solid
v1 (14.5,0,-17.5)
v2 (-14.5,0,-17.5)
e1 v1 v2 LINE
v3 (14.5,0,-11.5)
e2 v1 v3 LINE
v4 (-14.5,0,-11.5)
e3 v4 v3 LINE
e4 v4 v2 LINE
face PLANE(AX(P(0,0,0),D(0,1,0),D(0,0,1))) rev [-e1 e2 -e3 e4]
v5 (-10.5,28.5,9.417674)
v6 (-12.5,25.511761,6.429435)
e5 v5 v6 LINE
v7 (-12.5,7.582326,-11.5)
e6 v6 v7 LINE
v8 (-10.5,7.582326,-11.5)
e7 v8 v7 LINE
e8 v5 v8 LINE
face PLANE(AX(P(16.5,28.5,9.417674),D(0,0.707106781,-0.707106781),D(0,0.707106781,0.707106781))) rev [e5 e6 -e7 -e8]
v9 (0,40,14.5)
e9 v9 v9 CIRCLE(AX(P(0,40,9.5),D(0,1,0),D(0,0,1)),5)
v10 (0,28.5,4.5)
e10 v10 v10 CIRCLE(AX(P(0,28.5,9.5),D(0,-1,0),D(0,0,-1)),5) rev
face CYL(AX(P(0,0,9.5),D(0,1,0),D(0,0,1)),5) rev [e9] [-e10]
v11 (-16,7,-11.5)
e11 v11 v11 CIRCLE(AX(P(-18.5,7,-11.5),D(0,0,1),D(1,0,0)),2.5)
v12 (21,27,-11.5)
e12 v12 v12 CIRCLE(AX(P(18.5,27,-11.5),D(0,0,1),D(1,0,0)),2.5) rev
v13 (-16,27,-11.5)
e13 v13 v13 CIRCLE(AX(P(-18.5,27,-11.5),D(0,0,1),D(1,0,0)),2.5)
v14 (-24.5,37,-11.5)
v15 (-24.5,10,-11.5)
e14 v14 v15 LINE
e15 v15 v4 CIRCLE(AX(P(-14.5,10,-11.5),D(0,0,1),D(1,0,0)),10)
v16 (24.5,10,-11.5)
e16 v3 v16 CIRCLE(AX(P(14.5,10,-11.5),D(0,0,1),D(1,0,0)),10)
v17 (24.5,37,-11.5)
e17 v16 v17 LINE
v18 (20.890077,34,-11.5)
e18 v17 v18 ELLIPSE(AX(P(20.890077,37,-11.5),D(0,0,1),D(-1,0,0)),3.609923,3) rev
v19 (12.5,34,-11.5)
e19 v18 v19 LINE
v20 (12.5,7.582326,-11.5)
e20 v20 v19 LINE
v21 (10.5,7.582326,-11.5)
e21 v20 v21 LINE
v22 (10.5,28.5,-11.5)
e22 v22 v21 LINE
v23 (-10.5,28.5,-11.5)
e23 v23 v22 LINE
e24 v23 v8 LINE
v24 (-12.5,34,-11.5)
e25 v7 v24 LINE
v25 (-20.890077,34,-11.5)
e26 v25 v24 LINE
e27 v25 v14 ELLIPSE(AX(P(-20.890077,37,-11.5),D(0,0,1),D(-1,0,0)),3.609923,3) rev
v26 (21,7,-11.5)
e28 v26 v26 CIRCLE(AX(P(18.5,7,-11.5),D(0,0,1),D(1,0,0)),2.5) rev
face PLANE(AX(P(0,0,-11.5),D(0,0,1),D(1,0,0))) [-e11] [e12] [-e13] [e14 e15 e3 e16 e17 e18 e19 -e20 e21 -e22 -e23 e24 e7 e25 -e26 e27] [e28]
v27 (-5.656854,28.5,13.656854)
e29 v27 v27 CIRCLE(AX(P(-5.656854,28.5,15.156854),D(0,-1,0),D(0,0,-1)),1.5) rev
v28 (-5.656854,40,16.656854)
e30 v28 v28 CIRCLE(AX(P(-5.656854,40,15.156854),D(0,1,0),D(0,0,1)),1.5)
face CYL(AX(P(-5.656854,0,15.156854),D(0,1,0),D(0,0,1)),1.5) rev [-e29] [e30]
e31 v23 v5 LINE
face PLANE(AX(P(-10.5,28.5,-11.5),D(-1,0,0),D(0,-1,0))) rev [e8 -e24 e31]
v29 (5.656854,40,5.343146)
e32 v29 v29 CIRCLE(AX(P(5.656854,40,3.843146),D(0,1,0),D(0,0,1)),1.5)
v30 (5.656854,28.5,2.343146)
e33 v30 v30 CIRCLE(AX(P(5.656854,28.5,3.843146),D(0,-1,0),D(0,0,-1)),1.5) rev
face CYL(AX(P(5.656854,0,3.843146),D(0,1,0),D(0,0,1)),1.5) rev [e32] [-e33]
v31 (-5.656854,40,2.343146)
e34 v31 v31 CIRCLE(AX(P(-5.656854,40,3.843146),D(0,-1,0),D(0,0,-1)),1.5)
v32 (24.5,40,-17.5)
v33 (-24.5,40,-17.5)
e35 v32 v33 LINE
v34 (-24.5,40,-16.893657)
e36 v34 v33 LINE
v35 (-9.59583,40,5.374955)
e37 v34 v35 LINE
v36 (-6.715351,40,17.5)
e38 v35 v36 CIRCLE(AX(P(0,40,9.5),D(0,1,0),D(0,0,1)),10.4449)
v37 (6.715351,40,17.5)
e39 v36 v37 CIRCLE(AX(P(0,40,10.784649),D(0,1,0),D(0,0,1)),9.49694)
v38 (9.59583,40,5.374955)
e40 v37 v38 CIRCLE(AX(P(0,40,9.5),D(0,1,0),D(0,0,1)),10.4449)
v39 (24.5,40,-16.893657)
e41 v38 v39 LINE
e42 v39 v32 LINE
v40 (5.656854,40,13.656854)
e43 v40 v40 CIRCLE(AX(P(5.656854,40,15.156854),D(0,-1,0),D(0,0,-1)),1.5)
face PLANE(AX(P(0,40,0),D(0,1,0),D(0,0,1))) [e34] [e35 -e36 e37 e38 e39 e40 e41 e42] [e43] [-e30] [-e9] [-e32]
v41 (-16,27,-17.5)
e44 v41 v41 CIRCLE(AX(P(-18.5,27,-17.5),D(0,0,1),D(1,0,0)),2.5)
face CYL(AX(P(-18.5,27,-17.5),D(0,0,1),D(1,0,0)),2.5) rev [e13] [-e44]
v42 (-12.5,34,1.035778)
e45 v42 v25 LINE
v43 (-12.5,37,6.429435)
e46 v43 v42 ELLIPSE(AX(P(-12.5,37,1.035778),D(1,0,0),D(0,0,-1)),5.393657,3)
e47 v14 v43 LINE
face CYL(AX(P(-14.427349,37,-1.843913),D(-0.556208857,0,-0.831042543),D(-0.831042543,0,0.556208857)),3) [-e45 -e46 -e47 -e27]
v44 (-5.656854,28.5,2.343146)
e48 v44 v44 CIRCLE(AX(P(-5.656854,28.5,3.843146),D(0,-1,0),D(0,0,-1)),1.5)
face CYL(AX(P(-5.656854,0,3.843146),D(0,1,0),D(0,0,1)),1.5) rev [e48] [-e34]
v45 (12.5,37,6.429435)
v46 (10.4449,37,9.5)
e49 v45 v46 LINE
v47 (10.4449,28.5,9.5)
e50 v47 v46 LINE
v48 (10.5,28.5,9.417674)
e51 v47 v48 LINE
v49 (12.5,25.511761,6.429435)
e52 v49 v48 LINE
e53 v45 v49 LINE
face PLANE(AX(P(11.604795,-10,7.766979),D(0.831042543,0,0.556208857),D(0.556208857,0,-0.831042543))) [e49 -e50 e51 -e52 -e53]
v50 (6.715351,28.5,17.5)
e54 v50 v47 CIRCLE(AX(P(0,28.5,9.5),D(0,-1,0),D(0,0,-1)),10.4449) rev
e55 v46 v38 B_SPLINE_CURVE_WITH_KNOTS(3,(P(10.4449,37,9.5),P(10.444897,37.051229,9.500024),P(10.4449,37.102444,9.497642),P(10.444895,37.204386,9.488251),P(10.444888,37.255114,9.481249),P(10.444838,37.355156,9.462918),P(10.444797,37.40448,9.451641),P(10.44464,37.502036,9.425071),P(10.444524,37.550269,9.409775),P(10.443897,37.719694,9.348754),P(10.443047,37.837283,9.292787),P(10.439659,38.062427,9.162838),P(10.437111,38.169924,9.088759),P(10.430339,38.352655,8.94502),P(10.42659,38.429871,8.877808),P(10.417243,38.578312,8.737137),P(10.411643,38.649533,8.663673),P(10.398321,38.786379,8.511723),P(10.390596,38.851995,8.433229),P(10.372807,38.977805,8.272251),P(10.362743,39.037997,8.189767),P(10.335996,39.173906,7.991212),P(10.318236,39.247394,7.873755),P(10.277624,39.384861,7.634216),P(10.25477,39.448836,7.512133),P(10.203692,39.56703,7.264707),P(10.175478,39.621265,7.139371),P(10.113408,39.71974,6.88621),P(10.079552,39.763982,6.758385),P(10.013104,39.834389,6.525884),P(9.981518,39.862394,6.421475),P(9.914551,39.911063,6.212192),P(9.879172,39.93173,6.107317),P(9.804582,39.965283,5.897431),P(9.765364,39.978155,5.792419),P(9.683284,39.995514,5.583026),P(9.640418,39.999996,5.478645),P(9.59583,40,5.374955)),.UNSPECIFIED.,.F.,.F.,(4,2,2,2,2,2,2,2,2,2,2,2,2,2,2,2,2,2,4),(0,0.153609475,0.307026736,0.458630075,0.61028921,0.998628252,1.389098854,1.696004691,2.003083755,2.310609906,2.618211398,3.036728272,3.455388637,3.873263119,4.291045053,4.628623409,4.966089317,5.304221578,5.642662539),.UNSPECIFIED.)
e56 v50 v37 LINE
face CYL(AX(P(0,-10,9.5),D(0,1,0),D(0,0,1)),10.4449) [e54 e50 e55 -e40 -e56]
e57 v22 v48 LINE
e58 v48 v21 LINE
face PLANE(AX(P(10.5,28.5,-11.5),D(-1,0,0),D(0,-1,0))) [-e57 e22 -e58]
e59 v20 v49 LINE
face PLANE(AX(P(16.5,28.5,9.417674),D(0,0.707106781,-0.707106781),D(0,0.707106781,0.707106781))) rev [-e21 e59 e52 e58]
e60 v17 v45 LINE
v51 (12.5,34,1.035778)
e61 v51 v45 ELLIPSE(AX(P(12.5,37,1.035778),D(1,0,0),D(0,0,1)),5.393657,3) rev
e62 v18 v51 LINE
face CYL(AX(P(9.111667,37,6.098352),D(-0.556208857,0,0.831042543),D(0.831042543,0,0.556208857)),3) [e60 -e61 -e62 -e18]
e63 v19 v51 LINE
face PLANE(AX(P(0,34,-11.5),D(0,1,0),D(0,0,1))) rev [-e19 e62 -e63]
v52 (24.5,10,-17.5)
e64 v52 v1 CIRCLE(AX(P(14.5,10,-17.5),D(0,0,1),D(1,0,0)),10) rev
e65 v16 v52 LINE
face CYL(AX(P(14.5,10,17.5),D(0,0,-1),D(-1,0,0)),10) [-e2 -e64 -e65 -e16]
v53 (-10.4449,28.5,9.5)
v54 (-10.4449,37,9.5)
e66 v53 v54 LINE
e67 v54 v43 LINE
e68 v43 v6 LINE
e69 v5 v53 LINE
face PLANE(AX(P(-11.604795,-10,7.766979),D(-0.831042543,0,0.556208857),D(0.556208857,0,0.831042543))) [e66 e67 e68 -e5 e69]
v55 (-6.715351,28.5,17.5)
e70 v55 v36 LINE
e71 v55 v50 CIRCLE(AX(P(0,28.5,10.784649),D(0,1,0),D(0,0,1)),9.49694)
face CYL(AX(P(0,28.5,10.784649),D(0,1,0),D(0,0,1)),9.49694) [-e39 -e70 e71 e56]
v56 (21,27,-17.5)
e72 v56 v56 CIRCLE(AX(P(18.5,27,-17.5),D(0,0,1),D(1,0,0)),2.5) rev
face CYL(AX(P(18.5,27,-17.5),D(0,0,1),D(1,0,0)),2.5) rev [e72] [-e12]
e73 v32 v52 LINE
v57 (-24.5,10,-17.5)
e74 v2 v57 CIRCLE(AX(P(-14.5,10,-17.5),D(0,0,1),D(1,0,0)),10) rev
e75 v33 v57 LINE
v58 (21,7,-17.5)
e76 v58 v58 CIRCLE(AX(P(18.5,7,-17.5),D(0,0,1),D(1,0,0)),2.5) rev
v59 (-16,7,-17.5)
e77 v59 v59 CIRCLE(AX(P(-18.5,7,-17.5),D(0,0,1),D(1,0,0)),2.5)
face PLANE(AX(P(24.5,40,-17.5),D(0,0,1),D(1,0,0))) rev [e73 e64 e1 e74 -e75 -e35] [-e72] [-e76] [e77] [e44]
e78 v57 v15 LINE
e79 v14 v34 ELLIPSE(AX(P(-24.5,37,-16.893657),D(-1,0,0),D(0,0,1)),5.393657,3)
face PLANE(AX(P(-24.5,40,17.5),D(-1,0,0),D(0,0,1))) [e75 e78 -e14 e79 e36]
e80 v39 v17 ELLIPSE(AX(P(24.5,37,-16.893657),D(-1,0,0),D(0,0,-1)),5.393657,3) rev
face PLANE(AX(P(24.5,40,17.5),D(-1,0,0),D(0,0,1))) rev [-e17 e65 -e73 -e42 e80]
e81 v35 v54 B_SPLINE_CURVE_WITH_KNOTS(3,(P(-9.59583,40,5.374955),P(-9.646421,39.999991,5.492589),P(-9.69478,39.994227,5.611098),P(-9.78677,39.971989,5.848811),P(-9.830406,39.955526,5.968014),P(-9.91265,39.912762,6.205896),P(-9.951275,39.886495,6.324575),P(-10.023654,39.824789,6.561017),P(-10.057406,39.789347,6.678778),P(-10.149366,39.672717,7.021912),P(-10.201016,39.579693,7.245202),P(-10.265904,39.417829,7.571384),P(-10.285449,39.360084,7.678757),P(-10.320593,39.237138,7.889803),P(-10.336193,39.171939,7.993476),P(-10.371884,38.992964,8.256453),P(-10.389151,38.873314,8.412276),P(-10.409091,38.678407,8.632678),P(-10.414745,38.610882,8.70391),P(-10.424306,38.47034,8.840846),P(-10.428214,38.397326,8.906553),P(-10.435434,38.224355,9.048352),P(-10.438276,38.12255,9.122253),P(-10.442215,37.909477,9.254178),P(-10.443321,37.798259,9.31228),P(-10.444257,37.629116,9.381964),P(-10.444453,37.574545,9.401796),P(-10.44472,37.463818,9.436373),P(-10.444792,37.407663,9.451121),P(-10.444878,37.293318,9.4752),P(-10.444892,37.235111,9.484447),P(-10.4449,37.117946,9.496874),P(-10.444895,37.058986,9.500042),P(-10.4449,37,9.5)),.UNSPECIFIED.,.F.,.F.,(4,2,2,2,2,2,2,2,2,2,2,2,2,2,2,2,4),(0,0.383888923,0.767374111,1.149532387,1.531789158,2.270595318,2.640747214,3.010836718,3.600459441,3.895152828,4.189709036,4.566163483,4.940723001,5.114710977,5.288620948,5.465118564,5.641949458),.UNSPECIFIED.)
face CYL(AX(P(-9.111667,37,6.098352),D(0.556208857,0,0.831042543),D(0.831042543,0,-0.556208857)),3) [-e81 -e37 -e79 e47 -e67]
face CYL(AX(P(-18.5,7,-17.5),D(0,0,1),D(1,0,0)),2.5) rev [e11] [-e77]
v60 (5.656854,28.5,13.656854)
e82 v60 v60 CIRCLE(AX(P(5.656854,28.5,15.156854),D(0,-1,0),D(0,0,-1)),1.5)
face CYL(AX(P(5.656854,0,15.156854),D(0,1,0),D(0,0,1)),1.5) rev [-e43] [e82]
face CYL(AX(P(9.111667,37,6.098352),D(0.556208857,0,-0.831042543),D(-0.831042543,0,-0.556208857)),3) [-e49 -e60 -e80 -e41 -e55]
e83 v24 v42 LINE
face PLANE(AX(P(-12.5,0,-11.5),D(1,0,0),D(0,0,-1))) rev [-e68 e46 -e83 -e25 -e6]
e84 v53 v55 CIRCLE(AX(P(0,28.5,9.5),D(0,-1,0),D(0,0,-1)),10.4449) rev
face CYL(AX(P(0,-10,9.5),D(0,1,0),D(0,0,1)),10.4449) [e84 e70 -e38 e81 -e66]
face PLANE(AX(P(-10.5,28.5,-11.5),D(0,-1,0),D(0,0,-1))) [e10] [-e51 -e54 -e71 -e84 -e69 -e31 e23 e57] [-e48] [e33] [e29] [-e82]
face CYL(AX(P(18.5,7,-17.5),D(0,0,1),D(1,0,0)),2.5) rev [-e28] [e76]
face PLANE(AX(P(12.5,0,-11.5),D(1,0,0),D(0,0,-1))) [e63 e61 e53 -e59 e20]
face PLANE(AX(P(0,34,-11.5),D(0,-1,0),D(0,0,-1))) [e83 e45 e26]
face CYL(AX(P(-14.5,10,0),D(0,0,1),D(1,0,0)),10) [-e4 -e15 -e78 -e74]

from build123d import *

# Parameters (mm, degrees)
SKETCH_1_W           = 49
SKETCH_1_H           = 35
EXTRUDE_1_DEPTH      = 40
SKETCH_2_R           = 5
SKETCH_2_R_2         = 1.5
CUT_EXTRUDE_1_DEPTH  = 40
SKETCH_3_W           = 12
SKETCH_3_H           = 34
CUT_EXTRUDE_3_DEPTH  = 29
CUT_EXTRUDE_6_DEPTH  = 50
SKETCH_7_W           = 21
SKETCH_7_H           = 28.5
CUT_EXTRUDE_8_DEPTH  = 29
CUT_EXTRUDE_10_DEPTH = 29
SKETCH_12_R          = 2.5
CUT_EXTRUDE_12_DEPTH = 56.14752941
FILLET_1_R           = 10
FILLET_2_R           = 10
FILLET_4_R           = 3
EXTRUDE_2_DEPTH      = 11.5


with BuildPart() as part:
    # 草圖1 → 填料-伸長1 (new body)
    with BuildSketch(Plane(origin=(0, 0, 0), x_dir=(1, 0, 0), z_dir=(0, 1, 0))):
        Rectangle(SKETCH_1_W, SKETCH_1_H)
    extrude(amount=EXTRUDE_1_DEPTH)

    # 草圖2 → 除料-伸長1 (cut)
    with BuildSketch(Plane(origin=(0, 40, 0), x_dir=(1, 0, 0), z_dir=(0, 1, 0))):
        with Locations(Location((0, -9.5, 0), (0, 0, 270))):
            Circle(SKETCH_2_R)
        with Locations(Location((5.656854249, -3.843145751, 0), (0, 0, 270))):
            Circle(SKETCH_2_R_2)
        with Locations(Location((5.656854249, -15.156854249, 0), (0, 0, 90))):
            Circle(SKETCH_2_R_2)
        with Locations(Location((-5.656854249, -15.156854249, 0), (0, 0, 270))):
            Circle(SKETCH_2_R_2)
        with Locations(Location((-5.656854249, -3.843145751, 0), (0, 0, 90))):
            Circle(SKETCH_2_R_2)
    extrude(amount=-CUT_EXTRUDE_1_DEPTH, mode=Mode.SUBTRACT)

    # 草圖3 → 除料-伸長3 (cut)
    with BuildSketch(Plane.XY.offset(17.5)):
        with Locations((-18.5, 17)):
            Rectangle(SKETCH_3_W, SKETCH_3_H)
        with Locations((18.5, 17)):
            Rectangle(SKETCH_3_W, SKETCH_3_H)
    extrude(amount=-CUT_EXTRUDE_3_DEPTH, mode=Mode.SUBTRACT)

    # 草圖6 → 除料-伸長6 (cut)
    with BuildSketch(Plane(origin=(0, 40, 0), x_dir=(1, 0, 0), z_dir=(0, 1, 0))):
        with BuildLine():
            Line((-10.444900063, -9.5), (-24.5, 11.5))
            Line((-24.5, 11.5), (-24.5, -17.5))
            Line((-24.5, -17.5), (-6.715350871, -17.5))
            ThreePointArc((-6.715350871, -17.5), (-9.466707613, -13.913318966), (-10.444900063, -9.5))
        make_face()
        with BuildLine():
            Line((24.5, 11.5), (10.444900063, -9.5))
            ThreePointArc((10.444900063, -9.5), (9.466707613, -13.913318966), (6.715350871, -17.5))
            Line((6.715350871, -17.5), (24.5, -17.5))
            Line((24.5, -17.5), (24.5, 11.5))
        make_face()
    extrude(amount=-CUT_EXTRUDE_6_DEPTH, mode=Mode.SUBTRACT)

    # 草圖7 → 除料-伸長8 (cut)
    with BuildSketch(Plane.XY.offset(17.5)):
        with Locations((0, 14.25)):
            Rectangle(SKETCH_7_W, SKETCH_7_H)
    extrude(amount=-CUT_EXTRUDE_8_DEPTH, mode=Mode.SUBTRACT)

    # 草圖10 → 除料-伸長10 (cut)
    with BuildSketch(Plane.ZY.offset(12.5)):
        Polygon((-11.5, 0), (6.429434947, 0), (9.417674105, 0), (9.417674105, 28.5), (-11.5, 7.582325895), align=None)
    extrude(amount=-CUT_EXTRUDE_10_DEPTH, mode=Mode.SUBTRACT)

    # 草圖12 → 除料-伸長12 (cut, through all)
    with BuildSketch(Plane.XY.offset(-11.5)):
        with Locations((18.5, 7)):
            Circle(SKETCH_12_R)
        with Locations((18.5, 27)):
            Circle(SKETCH_12_R)
        with Locations((-18.5, 7)):
            Circle(SKETCH_12_R)
        with Locations((-18.5, 27)):
            Circle(SKETCH_12_R)
    extrude(amount=-CUT_EXTRUDE_12_DEPTH, mode=Mode.SUBTRACT)

    # 圓角1
    fillet_1_edges = [part.edges().sort_by_distance(p)[0] for p in [
        (-24.5, 0, -14.5),
    ]]
    fillet(fillet_1_edges, radius=FILLET_1_R)

    # 圓角2
    fillet_2_edges = [part.edges().sort_by_distance(p)[0] for p in [
        (24.5, 0, -14.5),
    ]]
    fillet(fillet_2_edges, radius=FILLET_2_R)

    # 圓角4
    fillet_4_edges = [part.edges().sort_by_distance(p)[0] for p in [
        (-18.5, 34, -2.535282526),
        (-17.472450031, 40, -1),
        (17.472450031, 40, -1),
        (18.5, 34, -2.535282526),
    ]]
    fillet(fillet_4_edges, radius=FILLET_4_R - 0.0001)  # a hair under: the kernel refuses the full size

    # 草圖14 → 填料-伸長2 (add)
    with BuildSketch(Plane(origin=(0, 40, 0), x_dir=(1, 0, 0), z_dir=(0, 1, 0))):
        with BuildLine():
            Line((-6.715350871, -17.5), (6.715350871, -17.5))
            ThreePointArc((6.715350871, -17.5), (0, -20.281589407), (-6.715350871, -17.5))
        make_face()
    extrude(amount=-EXTRUDE_2_DEPTH)


solid = part.part
